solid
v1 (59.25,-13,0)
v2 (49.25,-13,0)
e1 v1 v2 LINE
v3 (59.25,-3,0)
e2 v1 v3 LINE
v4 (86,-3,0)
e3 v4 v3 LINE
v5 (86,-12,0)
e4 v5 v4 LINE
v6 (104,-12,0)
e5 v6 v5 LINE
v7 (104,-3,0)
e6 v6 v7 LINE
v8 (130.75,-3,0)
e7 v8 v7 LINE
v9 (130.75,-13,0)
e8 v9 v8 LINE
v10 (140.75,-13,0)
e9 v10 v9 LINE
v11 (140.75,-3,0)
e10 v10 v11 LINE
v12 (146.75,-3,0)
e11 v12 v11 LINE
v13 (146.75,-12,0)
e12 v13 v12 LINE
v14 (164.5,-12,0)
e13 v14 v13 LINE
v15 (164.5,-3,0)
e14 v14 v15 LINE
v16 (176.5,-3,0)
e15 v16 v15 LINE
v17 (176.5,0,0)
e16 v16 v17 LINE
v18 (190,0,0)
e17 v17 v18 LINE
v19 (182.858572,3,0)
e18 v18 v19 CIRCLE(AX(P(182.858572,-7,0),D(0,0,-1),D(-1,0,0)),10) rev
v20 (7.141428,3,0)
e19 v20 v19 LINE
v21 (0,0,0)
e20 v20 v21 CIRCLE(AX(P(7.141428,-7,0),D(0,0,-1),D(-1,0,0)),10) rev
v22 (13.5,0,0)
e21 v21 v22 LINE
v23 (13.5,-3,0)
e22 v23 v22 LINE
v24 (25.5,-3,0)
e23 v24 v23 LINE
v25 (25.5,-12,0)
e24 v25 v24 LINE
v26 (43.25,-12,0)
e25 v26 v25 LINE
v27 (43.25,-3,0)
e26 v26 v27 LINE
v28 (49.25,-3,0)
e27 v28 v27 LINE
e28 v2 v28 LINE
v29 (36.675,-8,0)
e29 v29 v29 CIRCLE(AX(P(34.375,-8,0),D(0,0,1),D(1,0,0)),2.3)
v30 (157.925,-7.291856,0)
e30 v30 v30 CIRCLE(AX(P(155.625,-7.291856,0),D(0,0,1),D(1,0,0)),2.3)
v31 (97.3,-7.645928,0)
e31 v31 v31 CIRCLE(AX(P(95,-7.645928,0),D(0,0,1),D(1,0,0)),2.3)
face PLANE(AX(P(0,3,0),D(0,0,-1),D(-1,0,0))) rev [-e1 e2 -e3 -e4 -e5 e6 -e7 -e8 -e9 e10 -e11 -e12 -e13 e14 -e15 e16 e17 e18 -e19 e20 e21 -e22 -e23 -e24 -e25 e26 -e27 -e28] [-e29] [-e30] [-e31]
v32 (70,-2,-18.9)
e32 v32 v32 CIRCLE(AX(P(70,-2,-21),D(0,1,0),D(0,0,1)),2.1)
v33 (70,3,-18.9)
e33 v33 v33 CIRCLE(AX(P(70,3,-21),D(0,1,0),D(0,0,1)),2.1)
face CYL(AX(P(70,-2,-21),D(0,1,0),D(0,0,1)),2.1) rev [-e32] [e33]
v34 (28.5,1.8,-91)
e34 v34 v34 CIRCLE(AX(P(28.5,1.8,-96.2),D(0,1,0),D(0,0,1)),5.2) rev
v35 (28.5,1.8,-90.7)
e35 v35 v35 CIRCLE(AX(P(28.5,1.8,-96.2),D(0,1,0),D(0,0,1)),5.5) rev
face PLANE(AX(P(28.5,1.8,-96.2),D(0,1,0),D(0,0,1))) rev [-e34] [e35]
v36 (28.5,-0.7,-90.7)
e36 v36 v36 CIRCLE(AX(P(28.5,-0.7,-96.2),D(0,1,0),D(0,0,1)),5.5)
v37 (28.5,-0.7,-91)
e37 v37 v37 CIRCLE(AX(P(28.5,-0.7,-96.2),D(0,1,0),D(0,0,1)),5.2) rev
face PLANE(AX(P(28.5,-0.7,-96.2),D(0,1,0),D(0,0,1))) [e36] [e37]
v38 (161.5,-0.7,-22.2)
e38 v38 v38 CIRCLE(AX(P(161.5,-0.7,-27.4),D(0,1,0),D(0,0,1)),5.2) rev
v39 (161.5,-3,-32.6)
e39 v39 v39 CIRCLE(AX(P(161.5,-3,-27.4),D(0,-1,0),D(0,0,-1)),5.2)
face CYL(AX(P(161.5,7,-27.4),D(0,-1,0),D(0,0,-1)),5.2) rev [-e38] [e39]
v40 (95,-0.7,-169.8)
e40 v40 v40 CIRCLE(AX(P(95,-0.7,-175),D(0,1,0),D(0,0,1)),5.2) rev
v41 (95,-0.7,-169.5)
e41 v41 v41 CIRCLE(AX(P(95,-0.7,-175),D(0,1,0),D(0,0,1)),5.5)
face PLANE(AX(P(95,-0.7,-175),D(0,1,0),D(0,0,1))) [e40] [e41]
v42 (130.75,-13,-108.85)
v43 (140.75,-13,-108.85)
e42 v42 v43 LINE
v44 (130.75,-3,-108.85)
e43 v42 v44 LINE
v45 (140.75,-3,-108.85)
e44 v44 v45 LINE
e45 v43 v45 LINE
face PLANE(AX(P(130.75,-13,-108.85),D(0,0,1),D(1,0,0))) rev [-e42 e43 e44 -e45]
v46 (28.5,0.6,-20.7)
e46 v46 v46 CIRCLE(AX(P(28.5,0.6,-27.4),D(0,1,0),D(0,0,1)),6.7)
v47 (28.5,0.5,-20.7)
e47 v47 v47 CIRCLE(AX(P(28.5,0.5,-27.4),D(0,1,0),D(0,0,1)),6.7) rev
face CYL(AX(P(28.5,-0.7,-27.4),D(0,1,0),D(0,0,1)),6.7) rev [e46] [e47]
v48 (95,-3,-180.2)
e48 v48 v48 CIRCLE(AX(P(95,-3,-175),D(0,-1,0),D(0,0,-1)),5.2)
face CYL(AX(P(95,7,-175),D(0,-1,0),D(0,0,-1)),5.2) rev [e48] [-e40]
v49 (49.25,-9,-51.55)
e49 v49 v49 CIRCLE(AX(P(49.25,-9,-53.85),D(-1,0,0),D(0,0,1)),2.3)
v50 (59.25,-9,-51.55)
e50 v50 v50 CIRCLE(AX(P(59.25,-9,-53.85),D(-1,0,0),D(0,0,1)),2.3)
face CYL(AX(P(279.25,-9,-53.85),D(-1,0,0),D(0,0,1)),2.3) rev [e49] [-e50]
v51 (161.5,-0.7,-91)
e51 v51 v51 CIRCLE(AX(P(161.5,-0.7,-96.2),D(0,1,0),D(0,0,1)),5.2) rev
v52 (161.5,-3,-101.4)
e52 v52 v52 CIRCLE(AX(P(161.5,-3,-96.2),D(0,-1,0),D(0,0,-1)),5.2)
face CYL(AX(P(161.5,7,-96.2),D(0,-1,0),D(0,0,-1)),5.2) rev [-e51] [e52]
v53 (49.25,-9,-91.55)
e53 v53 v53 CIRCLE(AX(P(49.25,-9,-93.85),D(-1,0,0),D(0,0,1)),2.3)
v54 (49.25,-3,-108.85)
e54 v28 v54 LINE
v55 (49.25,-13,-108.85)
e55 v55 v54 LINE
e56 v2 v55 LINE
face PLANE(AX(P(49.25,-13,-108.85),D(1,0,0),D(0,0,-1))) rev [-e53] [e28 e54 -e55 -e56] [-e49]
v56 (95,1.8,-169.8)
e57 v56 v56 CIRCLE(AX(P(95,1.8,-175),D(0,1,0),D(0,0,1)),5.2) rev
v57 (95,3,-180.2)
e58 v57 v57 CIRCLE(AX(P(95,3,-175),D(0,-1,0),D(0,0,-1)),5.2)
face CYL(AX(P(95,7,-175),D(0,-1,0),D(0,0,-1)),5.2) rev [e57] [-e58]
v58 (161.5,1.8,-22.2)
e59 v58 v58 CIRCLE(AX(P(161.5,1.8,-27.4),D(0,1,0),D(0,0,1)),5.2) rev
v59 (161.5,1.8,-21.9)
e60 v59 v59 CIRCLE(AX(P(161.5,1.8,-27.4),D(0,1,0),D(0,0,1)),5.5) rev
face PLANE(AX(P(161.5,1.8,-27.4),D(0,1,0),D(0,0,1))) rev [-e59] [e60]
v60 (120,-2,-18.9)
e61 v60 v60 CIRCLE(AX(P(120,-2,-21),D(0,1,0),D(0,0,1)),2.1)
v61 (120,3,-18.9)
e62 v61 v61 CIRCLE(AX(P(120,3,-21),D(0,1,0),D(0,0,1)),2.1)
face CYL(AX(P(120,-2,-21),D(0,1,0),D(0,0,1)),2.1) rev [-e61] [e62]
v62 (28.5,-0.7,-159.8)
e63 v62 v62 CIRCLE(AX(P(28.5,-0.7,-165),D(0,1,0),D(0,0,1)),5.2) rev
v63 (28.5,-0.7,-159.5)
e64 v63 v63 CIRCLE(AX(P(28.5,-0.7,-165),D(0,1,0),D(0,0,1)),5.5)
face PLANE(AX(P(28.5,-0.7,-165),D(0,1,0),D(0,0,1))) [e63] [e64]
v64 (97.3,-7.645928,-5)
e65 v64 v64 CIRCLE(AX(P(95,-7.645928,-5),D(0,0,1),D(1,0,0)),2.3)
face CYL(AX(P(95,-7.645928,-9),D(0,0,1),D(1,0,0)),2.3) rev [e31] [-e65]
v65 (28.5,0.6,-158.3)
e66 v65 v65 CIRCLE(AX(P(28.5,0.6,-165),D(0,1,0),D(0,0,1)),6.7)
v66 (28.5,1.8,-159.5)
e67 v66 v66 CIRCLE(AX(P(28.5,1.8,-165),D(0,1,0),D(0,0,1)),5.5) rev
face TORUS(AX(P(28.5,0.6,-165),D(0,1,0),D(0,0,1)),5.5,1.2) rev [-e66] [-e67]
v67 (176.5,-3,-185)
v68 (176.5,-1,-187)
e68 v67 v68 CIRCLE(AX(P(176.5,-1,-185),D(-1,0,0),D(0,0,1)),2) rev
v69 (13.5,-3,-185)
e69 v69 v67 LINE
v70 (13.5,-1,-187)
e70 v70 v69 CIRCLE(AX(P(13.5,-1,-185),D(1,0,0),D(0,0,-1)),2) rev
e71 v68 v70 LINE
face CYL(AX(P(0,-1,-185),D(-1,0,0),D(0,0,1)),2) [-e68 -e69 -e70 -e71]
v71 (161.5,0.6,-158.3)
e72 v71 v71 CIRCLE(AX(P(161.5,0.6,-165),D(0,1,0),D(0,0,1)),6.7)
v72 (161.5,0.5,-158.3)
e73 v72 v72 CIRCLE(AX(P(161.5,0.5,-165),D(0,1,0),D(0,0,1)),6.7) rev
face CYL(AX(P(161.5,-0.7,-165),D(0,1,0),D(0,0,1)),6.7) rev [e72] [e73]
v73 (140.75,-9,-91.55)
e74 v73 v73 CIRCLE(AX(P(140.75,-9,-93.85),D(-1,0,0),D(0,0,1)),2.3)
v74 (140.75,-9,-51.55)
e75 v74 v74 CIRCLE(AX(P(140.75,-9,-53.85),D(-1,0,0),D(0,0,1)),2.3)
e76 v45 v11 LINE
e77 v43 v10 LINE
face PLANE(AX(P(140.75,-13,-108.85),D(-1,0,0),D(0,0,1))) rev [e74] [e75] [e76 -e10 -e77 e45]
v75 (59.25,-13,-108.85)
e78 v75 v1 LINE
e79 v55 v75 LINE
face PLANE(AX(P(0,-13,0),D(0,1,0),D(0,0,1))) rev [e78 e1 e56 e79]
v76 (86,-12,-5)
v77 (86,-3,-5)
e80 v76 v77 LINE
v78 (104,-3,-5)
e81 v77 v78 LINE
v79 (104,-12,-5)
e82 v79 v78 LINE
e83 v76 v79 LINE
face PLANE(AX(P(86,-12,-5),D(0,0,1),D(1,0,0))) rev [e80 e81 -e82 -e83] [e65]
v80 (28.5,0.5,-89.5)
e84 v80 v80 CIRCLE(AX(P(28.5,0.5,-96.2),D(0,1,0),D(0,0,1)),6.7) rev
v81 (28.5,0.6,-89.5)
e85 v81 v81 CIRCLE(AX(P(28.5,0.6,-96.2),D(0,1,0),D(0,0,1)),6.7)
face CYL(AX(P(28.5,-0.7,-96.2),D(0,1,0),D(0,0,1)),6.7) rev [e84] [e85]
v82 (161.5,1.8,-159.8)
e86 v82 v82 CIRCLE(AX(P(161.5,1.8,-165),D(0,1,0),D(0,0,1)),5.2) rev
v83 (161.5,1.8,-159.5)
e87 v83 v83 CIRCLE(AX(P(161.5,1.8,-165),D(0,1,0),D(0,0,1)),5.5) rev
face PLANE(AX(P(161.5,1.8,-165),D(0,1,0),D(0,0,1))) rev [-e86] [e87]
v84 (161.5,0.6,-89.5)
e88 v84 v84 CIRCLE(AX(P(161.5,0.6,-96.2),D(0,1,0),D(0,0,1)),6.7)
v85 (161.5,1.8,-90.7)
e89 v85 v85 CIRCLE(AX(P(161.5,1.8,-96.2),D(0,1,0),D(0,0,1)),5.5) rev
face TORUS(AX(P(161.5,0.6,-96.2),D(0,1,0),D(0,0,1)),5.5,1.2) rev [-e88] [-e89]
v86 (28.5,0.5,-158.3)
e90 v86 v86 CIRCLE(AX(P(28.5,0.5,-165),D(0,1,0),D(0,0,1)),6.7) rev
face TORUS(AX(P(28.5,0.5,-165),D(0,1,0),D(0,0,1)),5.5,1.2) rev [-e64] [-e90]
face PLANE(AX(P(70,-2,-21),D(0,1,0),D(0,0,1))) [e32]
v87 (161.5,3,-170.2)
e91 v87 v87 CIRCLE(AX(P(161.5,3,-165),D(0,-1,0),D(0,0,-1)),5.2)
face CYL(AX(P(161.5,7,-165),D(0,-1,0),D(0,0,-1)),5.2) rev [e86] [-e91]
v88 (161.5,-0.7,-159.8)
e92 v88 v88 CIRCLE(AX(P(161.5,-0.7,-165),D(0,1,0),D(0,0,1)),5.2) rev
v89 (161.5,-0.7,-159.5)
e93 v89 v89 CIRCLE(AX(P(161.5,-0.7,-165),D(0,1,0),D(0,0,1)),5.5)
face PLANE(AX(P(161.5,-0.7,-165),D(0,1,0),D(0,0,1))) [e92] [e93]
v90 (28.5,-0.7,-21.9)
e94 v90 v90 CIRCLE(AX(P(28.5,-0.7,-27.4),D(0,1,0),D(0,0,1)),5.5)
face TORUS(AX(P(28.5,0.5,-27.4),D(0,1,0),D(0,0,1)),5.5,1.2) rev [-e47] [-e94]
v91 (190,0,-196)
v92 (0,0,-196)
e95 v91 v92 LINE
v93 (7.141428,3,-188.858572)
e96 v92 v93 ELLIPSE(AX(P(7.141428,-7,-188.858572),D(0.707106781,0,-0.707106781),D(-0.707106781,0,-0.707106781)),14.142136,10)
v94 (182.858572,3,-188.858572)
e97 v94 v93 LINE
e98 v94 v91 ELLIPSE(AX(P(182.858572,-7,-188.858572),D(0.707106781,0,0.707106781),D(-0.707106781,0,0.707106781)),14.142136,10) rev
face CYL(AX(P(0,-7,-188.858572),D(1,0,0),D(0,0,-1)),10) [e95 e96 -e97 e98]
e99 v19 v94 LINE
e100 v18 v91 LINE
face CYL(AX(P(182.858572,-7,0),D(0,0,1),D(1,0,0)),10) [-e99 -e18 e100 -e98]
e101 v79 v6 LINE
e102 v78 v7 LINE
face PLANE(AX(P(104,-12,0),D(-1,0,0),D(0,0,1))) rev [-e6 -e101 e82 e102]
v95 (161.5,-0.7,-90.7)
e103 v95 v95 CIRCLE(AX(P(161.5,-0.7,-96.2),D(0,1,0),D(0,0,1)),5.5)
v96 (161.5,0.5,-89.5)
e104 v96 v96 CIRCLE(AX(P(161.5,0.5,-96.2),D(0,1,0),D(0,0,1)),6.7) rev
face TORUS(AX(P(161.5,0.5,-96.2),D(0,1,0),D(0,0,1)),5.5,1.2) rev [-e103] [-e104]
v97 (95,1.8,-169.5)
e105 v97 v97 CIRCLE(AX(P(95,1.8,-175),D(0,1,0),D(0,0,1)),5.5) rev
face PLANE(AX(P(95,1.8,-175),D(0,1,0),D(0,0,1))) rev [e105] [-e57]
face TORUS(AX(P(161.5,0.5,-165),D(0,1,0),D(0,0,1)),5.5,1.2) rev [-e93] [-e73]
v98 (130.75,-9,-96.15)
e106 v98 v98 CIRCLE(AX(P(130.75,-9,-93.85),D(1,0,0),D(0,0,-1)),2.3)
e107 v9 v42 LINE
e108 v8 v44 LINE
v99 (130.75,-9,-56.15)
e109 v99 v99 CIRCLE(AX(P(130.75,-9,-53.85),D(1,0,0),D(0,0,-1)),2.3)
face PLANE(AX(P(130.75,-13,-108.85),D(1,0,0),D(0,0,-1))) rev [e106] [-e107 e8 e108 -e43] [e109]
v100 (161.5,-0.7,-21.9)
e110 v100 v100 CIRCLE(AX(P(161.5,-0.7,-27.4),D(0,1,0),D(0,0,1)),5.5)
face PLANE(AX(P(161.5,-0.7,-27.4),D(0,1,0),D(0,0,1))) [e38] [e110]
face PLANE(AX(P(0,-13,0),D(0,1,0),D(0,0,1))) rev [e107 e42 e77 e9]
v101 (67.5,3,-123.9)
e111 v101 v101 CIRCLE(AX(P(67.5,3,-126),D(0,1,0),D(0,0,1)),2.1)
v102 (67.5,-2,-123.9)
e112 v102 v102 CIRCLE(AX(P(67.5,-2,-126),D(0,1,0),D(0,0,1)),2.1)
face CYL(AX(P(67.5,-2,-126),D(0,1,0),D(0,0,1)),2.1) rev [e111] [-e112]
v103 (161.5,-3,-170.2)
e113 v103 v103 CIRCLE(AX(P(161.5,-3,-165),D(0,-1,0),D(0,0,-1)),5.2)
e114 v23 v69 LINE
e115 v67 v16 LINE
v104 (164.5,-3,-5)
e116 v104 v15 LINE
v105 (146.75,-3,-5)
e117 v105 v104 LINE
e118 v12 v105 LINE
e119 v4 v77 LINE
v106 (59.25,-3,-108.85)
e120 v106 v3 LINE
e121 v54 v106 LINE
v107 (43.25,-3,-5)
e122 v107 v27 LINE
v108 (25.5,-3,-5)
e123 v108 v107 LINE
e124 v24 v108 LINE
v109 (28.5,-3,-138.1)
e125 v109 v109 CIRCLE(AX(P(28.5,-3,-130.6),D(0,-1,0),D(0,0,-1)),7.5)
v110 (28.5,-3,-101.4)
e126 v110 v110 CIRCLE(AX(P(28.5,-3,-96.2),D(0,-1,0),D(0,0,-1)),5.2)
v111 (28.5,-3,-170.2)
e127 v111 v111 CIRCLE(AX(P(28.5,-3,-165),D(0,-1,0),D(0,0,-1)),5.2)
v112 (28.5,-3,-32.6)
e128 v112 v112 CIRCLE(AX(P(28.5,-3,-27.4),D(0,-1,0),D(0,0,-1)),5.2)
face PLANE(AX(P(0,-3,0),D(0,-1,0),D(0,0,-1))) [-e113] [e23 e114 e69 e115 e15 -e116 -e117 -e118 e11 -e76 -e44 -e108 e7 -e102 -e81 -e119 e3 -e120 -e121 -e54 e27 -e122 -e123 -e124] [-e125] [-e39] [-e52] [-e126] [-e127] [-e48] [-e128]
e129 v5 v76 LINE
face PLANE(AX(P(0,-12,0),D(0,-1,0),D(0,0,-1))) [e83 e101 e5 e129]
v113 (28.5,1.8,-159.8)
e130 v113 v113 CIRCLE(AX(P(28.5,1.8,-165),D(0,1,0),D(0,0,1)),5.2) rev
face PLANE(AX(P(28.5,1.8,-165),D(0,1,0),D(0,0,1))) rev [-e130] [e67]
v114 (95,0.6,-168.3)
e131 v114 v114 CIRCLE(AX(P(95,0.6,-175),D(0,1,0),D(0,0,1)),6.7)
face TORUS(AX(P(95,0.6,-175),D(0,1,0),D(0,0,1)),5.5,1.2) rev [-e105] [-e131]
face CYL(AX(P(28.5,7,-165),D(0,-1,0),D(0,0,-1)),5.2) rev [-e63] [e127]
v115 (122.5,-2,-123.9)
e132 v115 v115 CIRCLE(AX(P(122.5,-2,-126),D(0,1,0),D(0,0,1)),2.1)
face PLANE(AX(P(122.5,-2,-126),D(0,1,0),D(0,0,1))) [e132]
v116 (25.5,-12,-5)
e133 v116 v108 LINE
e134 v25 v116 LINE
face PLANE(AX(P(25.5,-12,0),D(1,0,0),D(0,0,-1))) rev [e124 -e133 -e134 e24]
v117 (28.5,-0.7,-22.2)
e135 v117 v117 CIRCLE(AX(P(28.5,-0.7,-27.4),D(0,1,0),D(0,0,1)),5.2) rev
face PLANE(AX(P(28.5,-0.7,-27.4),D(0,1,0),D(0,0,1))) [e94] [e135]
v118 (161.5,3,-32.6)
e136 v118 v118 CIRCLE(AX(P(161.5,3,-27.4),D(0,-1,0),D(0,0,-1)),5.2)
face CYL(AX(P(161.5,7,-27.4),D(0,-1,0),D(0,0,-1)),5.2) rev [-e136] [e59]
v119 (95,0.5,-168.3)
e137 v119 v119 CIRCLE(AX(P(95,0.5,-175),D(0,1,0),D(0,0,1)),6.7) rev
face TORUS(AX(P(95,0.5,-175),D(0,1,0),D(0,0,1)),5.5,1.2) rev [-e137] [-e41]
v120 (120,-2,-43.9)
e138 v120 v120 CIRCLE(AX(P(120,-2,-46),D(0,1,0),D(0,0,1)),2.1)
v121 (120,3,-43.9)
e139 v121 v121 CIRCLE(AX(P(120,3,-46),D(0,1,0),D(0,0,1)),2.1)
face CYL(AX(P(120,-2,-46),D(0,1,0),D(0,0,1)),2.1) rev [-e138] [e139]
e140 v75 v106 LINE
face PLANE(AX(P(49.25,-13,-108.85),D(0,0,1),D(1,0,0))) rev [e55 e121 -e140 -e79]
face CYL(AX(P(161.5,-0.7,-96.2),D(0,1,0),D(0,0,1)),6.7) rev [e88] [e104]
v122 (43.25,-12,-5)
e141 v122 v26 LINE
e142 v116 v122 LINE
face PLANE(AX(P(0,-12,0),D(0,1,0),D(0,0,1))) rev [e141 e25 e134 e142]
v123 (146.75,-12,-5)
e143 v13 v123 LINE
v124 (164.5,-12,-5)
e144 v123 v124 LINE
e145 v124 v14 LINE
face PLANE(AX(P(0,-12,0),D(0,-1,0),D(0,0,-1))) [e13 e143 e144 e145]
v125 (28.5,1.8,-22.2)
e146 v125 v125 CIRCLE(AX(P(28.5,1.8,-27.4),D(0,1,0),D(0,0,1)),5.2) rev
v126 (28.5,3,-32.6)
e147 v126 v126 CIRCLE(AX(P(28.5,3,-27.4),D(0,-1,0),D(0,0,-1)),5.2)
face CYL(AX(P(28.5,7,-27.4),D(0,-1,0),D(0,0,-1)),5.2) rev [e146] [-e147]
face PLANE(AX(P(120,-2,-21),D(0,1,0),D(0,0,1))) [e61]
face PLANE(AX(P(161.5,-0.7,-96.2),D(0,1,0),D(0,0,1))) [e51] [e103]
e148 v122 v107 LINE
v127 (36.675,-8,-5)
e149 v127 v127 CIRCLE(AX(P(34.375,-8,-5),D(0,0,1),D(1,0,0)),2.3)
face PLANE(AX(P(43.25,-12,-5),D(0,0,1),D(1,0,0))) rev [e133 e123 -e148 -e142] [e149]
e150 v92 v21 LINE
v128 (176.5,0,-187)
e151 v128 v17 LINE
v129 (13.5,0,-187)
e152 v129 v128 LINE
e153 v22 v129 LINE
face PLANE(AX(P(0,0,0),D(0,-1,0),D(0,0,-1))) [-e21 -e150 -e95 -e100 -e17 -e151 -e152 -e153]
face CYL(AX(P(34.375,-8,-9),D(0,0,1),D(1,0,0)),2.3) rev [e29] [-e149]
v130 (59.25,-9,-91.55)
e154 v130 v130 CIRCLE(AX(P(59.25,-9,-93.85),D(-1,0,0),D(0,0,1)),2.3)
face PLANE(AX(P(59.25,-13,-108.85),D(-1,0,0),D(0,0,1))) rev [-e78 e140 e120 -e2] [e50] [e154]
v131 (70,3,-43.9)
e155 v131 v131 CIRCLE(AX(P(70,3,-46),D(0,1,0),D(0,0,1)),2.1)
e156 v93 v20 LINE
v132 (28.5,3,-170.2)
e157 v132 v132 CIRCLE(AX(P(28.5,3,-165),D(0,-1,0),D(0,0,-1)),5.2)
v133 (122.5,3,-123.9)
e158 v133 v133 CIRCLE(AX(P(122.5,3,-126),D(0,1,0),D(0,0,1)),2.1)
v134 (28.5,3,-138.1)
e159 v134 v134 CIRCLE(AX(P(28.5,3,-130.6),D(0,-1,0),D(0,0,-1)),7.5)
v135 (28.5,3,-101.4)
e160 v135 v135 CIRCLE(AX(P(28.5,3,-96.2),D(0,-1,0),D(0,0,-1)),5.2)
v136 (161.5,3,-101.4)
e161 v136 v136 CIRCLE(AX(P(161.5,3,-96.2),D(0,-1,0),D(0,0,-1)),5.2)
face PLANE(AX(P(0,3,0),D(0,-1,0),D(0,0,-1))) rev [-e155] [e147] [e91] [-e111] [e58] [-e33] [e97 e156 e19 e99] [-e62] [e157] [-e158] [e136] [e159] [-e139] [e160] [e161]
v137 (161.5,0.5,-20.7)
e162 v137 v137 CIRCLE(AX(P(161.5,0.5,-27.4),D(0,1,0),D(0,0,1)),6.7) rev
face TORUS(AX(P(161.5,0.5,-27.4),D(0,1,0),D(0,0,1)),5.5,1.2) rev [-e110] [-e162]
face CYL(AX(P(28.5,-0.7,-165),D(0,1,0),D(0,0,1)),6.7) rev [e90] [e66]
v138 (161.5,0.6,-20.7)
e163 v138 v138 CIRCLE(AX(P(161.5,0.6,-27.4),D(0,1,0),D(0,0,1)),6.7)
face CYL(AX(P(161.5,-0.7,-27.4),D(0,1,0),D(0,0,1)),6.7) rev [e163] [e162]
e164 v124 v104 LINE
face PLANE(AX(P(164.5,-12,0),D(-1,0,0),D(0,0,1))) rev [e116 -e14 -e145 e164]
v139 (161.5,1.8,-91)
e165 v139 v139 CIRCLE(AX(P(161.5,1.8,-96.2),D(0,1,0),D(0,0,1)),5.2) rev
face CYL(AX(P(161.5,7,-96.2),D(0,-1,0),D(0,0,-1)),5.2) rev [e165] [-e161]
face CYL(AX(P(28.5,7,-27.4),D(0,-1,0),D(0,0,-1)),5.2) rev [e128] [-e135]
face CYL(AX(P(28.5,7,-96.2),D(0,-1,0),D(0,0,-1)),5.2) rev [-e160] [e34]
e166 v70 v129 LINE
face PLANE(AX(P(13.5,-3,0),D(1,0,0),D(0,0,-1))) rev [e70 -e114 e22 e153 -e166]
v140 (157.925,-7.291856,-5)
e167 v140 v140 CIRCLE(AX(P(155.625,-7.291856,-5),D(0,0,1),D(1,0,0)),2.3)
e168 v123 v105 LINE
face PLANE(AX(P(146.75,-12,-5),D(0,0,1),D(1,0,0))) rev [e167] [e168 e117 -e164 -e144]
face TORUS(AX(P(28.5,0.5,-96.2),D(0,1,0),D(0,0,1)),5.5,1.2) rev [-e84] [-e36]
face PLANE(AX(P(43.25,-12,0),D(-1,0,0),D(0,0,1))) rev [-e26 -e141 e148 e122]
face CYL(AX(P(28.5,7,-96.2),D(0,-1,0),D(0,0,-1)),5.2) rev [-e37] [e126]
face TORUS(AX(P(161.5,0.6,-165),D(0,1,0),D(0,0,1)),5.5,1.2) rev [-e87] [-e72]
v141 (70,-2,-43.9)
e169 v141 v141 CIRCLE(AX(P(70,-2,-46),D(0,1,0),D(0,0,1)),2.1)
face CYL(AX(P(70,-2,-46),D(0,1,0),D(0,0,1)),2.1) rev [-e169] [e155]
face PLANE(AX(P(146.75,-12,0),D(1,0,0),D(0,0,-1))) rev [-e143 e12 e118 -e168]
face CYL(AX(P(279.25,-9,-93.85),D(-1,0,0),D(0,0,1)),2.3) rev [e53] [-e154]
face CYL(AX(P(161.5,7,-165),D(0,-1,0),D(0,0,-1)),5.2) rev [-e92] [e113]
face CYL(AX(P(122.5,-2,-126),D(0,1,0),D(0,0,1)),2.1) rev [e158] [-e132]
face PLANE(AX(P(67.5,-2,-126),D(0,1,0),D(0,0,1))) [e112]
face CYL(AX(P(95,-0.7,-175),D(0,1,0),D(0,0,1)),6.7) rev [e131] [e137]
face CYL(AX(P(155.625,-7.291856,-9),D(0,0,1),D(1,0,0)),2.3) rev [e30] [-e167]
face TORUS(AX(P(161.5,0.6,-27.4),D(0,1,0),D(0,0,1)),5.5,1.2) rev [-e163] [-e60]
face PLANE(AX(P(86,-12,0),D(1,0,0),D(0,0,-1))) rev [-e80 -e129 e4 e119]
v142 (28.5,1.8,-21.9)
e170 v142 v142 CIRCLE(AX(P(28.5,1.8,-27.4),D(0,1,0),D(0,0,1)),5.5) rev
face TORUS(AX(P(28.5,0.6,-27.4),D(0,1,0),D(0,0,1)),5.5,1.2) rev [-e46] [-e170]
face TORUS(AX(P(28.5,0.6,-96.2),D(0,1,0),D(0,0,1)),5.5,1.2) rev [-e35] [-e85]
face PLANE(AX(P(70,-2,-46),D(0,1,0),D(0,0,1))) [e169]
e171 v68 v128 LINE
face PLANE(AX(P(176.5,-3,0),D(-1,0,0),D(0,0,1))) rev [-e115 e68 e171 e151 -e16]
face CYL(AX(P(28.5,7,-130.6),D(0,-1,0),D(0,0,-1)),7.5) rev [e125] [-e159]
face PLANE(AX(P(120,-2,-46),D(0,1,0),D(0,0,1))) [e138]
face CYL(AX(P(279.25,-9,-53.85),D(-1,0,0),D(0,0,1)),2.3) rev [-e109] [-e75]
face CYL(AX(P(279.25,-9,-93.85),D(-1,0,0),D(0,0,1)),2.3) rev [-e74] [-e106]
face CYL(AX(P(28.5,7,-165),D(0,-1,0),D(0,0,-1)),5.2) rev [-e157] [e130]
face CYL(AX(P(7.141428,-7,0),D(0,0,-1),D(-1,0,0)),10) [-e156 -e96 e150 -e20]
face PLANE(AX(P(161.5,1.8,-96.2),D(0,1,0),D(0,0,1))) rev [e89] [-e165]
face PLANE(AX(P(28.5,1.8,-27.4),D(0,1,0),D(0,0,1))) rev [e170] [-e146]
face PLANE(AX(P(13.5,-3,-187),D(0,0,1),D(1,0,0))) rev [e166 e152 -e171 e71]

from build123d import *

# Parameters (mm, degrees)
SKETCH_1_W          = 190
SKETCH_1_H          = 196
EXTRUDE_1_DEPTH     = 3
FILLET_1_R          = 10
SKETCH_2_W          = 163
SKETCH_2_H          = 187
EXTRUDE_2_DEPTH     = 3
SKETCH_3_W          = 10
SKETCH_3_H          = 108.85
EXTRUDE_3_DEPTH     = 10
SKETCH_4_W          = 17.75
SKETCH_4_H          = 5
SKETCH_4_W_2        = 18
EXTRUDE_4_DEPTH     = 9
SKETCH_5_R          = 2.3
CUT_EXTRUDE_1_DEPTH = 9
SKETCH_6_R          = 2.3
CUT_EXTRUDE_2_DEPTH = 230
FILLET_2_R          = 2
SKETCH_8_R          = 5.2
CUT_EXTRUDE_3_DEPTH = 10
CUT_EXTRUDE_START   = -1.2
SKETCH_9_R          = 6.7
CUT_EXTRUDE_4_DEPTH = 2.5
FILLET_3_R          = 1.2
SKETCH_12_R         = 7.5
CUT_EXTRUDE_5_DEPTH = 10
SKETCH_13_R         = 2.1
CUT_EXTRUDE_6_DEPTH = 5


with BuildPart() as part:
    # Эскиз1 → Бобышка-Вытянуть1 (new body)
    with BuildSketch(Plane(origin=(0, 0, 0), x_dir=(1, 0, 0), z_dir=(0, 1, 0))):
        with Locations((95, 98)):
            Rectangle(SKETCH_1_W, SKETCH_1_H)
    extrude(amount=EXTRUDE_1_DEPTH)

    # Скругление1
    # the kernel refuses this fillet: 10 mm, written as the material it takes off along each edge
    with BuildSketch(Plane(origin=(207.853571071, 3, -196), x_dir=(0, -1, 0), z_dir=(-1, 0, 0))) as fillet_1_piece_1:
        with BuildLine():
            CenterArc((10, 7.141428429), FILLET_1_R, 180, 45.572995999)
            Line((0, 7.141428429), (-0.2, 7.141428429))
            Line((-0.2, 7.141428429), (-0.2, 0))
            Line((-0.2, 0), (0, -0.2))
            ThreePointArc((0, -0.2), (1.5, -0.2), (2.86, -0.142828569))
            Line((2.86, -0.142828569), (3, 0))
        make_face()
    extrude(amount=225.707142143, mode=Mode.SUBTRACT)
    with BuildSketch(Plane(origin=(190, 3, 17.853571071), x_dir=(0, -1, 0), z_dir=(0, 0, -1)), Plane(origin=(0, 3, -213.853571071), x_dir=(0, -1, 0), z_dir=(0, 0, 1))) as fillet_1_piece_2:
        with BuildLine():
            CenterArc((10, 7.141428429), FILLET_1_R, 180, 45.572995999)
            Line((0, 7.141428429), (-0.2, 7.141428429))
            Line((-0.2, 7.141428429), (-0.2, 0))
            Line((-0.2, 0), (0, -0.2))
            ThreePointArc((0, -0.2), (1.5, -0.2), (2.86, -0.142828569))
            Line((2.86, -0.142828569), (3, 0))
        make_face()
    extrude(amount=231.707142143, mode=Mode.SUBTRACT)

    # Эскиз2 → Бобышка-Вытянуть2 (add)
    with BuildSketch(Plane.XZ):
        with Locations((95, -93.5)):
            Rectangle(SKETCH_2_W, SKETCH_2_H)
    extrude(amount=EXTRUDE_2_DEPTH)

    # Эскиз3 → Бобышка-Вытянуть3 (add)
    with BuildSketch(Plane.XZ.offset(3)):
        with Locations((54.25, -54.425)):
            Rectangle(SKETCH_3_W, SKETCH_3_H)
        with Locations((135.75, -54.425)):
            Rectangle(SKETCH_3_W, SKETCH_3_H)
    extrude(amount=EXTRUDE_3_DEPTH)

    # Эскиз4 → Бобышка-Вытянуть4 (add)
    with BuildSketch(Plane.XZ.offset(3)):
        with Locations((34.375, -2.5)):
            Rectangle(SKETCH_4_W, SKETCH_4_H)
        with Locations((95, -2.5)):
            Rectangle(SKETCH_4_W_2, SKETCH_4_H)
        with Locations((155.625, -2.5)):
            Rectangle(SKETCH_4_W, SKETCH_4_H)
    extrude(amount=EXTRUDE_4_DEPTH)

    # Эскиз5 → Вырез-Вытянуть1 (cut)
    with BuildSketch(Plane.XY):
        with Locations((95, -7.645927853)):
            Circle(SKETCH_5_R)
        with Locations((155.625, -7.291855705)):
            Circle(SKETCH_5_R)
        with Locations((34.375, -8)):
            Circle(SKETCH_5_R)
    extrude(amount=-CUT_EXTRUDE_1_DEPTH, mode=Mode.SUBTRACT)

    # Эскиз6 → Вырез-Вытянуть2 (cut)
    with BuildSketch(Plane.ZY.offset(-49.25)):
        with Locations((-93.85, -9)):
            Circle(SKETCH_6_R)
        with Locations((-53.85, -9)):
            Circle(SKETCH_6_R)
    extrude(amount=-CUT_EXTRUDE_2_DEPTH, mode=Mode.SUBTRACT)

    # Скругление2
    fillet_2_edges = [part.edges().sort_by_distance(p)[0] for p in [
        (95, -3, -187),
    ]]
    fillet(fillet_2_edges, radius=FILLET_2_R)

    # Эскиз8 → Вырез-Вытянуть3 (cut)
    with BuildSketch(Plane.XZ.offset(3)):
        with Locations(Location((28.5, -27.4, 0), (0, 0, 270))):
            Circle(SKETCH_8_R)
        with Locations(Location((28.5, -96.2, 0), (0, 0, 270))):
            Circle(SKETCH_8_R)
        with Locations(Location((28.5, -165, 0), (0, 0, 270))):
            Circle(SKETCH_8_R)
        with Locations(Location((95, -175, 0), (0, 0, 270))):
            Circle(SKETCH_8_R)
        with Locations(Location((161.5, -165, 0), (0, 0, 270))):
            Circle(SKETCH_8_R)
        with Locations(Location((161.5, -96.2, 0), (0, 0, 270))):
            Circle(SKETCH_8_R)
        with Locations(Location((161.5, -27.4, 0), (0, 0, 270))):
            Circle(SKETCH_8_R)
    extrude(amount=-CUT_EXTRUDE_3_DEPTH, mode=Mode.SUBTRACT)

    # Эскиз9 → Вырез-Вытянуть4 (cut)
    with BuildSketch(Plane(origin=(0, 3, 0), x_dir=(1, 0, 0), z_dir=(0, 1, 0)).offset(CUT_EXTRUDE_START)):
        with Locations(Location((28.5, 27.4, 0), (0, 0, 270))):
            Circle(SKETCH_9_R)
        with Locations(Location((28.5, 96.2, 0), (0, 0, 270))):
            Circle(SKETCH_9_R)
        with Locations(Location((28.5, 165, 0), (0, 0, 270))):
            Circle(SKETCH_9_R)
        with Locations(Location((95, 175, 0), (0, 0, 270))):
            Circle(SKETCH_9_R)
        with Locations(Location((161.5, 165, 0), (0, 0, 270))):
            Circle(SKETCH_9_R)
        with Locations(Location((161.5, 96.2, 0), (0, 0, 270))):
            Circle(SKETCH_9_R)
        with Locations(Location((161.5, 27.4, 0), (0, 0, 270))):
            Circle(SKETCH_9_R)
    extrude(amount=-CUT_EXTRUDE_4_DEPTH, mode=Mode.SUBTRACT)

    # Скругление3
    fillet_3_edges = [part.edges().sort_by_distance(p)[0] for p in [
        (28.5, 1.8, -102.9),
        (28.5, -0.7, -102.9),
        (28.5, 1.8, -171.7),
        (28.5, -0.7, -171.7),
        (95, 1.8, -181.7),
        (95, -0.7, -181.7),
        (161.5, 1.8, -171.7),
        (161.5, -0.7, -171.7),
        (161.5, 1.8, -102.9),
        (161.5, -0.7, -102.9),
        (161.5, 1.8, -34.1),
        (161.5, -0.7, -34.1),
        (28.5, 1.8, -34.1),
        (28.5, -0.7, -34.1),
    ]]
    fillet(fillet_3_edges, radius=FILLET_3_R)

    # Эскиз12 → Вырез-Вытянуть5 (cut)
    with BuildSketch(Plane.XZ.offset(3)):
        with Locations(Location((28.5, -130.6, 0), (0, 0, 270))):
            Circle(SKETCH_12_R)
    extrude(amount=-CUT_EXTRUDE_5_DEPTH, mode=Mode.SUBTRACT)

    # Эскиз13 → Вырез-Вытянуть6 (cut)
    with BuildSketch(Plane(origin=(0, 3, 0), x_dir=(1, 0, 0), z_dir=(0, 1, 0))):
        with Locations(Location((67.5, 126, 0), (0, 0, 270))):
            Circle(SKETCH_13_R)
        with Locations(Location((122.5, 126, 0), (0, 0, 270))):
            Circle(SKETCH_13_R)
        with Locations(Location((70, 46, 0), (0, 0, 270))):
            Circle(SKETCH_13_R)
        with Locations(Location((70, 21, 0), (0, 0, 270))):
            Circle(SKETCH_13_R)
        with Locations(Location((120, 21, 0), (0, 0, 270))):
            Circle(SKETCH_13_R)
        with Locations(Location((120, 46, 0), (0, 0, 270))):
            Circle(SKETCH_13_R)
    extrude(amount=-CUT_EXTRUDE_6_DEPTH, mode=Mode.SUBTRACT)


solid = part.part
